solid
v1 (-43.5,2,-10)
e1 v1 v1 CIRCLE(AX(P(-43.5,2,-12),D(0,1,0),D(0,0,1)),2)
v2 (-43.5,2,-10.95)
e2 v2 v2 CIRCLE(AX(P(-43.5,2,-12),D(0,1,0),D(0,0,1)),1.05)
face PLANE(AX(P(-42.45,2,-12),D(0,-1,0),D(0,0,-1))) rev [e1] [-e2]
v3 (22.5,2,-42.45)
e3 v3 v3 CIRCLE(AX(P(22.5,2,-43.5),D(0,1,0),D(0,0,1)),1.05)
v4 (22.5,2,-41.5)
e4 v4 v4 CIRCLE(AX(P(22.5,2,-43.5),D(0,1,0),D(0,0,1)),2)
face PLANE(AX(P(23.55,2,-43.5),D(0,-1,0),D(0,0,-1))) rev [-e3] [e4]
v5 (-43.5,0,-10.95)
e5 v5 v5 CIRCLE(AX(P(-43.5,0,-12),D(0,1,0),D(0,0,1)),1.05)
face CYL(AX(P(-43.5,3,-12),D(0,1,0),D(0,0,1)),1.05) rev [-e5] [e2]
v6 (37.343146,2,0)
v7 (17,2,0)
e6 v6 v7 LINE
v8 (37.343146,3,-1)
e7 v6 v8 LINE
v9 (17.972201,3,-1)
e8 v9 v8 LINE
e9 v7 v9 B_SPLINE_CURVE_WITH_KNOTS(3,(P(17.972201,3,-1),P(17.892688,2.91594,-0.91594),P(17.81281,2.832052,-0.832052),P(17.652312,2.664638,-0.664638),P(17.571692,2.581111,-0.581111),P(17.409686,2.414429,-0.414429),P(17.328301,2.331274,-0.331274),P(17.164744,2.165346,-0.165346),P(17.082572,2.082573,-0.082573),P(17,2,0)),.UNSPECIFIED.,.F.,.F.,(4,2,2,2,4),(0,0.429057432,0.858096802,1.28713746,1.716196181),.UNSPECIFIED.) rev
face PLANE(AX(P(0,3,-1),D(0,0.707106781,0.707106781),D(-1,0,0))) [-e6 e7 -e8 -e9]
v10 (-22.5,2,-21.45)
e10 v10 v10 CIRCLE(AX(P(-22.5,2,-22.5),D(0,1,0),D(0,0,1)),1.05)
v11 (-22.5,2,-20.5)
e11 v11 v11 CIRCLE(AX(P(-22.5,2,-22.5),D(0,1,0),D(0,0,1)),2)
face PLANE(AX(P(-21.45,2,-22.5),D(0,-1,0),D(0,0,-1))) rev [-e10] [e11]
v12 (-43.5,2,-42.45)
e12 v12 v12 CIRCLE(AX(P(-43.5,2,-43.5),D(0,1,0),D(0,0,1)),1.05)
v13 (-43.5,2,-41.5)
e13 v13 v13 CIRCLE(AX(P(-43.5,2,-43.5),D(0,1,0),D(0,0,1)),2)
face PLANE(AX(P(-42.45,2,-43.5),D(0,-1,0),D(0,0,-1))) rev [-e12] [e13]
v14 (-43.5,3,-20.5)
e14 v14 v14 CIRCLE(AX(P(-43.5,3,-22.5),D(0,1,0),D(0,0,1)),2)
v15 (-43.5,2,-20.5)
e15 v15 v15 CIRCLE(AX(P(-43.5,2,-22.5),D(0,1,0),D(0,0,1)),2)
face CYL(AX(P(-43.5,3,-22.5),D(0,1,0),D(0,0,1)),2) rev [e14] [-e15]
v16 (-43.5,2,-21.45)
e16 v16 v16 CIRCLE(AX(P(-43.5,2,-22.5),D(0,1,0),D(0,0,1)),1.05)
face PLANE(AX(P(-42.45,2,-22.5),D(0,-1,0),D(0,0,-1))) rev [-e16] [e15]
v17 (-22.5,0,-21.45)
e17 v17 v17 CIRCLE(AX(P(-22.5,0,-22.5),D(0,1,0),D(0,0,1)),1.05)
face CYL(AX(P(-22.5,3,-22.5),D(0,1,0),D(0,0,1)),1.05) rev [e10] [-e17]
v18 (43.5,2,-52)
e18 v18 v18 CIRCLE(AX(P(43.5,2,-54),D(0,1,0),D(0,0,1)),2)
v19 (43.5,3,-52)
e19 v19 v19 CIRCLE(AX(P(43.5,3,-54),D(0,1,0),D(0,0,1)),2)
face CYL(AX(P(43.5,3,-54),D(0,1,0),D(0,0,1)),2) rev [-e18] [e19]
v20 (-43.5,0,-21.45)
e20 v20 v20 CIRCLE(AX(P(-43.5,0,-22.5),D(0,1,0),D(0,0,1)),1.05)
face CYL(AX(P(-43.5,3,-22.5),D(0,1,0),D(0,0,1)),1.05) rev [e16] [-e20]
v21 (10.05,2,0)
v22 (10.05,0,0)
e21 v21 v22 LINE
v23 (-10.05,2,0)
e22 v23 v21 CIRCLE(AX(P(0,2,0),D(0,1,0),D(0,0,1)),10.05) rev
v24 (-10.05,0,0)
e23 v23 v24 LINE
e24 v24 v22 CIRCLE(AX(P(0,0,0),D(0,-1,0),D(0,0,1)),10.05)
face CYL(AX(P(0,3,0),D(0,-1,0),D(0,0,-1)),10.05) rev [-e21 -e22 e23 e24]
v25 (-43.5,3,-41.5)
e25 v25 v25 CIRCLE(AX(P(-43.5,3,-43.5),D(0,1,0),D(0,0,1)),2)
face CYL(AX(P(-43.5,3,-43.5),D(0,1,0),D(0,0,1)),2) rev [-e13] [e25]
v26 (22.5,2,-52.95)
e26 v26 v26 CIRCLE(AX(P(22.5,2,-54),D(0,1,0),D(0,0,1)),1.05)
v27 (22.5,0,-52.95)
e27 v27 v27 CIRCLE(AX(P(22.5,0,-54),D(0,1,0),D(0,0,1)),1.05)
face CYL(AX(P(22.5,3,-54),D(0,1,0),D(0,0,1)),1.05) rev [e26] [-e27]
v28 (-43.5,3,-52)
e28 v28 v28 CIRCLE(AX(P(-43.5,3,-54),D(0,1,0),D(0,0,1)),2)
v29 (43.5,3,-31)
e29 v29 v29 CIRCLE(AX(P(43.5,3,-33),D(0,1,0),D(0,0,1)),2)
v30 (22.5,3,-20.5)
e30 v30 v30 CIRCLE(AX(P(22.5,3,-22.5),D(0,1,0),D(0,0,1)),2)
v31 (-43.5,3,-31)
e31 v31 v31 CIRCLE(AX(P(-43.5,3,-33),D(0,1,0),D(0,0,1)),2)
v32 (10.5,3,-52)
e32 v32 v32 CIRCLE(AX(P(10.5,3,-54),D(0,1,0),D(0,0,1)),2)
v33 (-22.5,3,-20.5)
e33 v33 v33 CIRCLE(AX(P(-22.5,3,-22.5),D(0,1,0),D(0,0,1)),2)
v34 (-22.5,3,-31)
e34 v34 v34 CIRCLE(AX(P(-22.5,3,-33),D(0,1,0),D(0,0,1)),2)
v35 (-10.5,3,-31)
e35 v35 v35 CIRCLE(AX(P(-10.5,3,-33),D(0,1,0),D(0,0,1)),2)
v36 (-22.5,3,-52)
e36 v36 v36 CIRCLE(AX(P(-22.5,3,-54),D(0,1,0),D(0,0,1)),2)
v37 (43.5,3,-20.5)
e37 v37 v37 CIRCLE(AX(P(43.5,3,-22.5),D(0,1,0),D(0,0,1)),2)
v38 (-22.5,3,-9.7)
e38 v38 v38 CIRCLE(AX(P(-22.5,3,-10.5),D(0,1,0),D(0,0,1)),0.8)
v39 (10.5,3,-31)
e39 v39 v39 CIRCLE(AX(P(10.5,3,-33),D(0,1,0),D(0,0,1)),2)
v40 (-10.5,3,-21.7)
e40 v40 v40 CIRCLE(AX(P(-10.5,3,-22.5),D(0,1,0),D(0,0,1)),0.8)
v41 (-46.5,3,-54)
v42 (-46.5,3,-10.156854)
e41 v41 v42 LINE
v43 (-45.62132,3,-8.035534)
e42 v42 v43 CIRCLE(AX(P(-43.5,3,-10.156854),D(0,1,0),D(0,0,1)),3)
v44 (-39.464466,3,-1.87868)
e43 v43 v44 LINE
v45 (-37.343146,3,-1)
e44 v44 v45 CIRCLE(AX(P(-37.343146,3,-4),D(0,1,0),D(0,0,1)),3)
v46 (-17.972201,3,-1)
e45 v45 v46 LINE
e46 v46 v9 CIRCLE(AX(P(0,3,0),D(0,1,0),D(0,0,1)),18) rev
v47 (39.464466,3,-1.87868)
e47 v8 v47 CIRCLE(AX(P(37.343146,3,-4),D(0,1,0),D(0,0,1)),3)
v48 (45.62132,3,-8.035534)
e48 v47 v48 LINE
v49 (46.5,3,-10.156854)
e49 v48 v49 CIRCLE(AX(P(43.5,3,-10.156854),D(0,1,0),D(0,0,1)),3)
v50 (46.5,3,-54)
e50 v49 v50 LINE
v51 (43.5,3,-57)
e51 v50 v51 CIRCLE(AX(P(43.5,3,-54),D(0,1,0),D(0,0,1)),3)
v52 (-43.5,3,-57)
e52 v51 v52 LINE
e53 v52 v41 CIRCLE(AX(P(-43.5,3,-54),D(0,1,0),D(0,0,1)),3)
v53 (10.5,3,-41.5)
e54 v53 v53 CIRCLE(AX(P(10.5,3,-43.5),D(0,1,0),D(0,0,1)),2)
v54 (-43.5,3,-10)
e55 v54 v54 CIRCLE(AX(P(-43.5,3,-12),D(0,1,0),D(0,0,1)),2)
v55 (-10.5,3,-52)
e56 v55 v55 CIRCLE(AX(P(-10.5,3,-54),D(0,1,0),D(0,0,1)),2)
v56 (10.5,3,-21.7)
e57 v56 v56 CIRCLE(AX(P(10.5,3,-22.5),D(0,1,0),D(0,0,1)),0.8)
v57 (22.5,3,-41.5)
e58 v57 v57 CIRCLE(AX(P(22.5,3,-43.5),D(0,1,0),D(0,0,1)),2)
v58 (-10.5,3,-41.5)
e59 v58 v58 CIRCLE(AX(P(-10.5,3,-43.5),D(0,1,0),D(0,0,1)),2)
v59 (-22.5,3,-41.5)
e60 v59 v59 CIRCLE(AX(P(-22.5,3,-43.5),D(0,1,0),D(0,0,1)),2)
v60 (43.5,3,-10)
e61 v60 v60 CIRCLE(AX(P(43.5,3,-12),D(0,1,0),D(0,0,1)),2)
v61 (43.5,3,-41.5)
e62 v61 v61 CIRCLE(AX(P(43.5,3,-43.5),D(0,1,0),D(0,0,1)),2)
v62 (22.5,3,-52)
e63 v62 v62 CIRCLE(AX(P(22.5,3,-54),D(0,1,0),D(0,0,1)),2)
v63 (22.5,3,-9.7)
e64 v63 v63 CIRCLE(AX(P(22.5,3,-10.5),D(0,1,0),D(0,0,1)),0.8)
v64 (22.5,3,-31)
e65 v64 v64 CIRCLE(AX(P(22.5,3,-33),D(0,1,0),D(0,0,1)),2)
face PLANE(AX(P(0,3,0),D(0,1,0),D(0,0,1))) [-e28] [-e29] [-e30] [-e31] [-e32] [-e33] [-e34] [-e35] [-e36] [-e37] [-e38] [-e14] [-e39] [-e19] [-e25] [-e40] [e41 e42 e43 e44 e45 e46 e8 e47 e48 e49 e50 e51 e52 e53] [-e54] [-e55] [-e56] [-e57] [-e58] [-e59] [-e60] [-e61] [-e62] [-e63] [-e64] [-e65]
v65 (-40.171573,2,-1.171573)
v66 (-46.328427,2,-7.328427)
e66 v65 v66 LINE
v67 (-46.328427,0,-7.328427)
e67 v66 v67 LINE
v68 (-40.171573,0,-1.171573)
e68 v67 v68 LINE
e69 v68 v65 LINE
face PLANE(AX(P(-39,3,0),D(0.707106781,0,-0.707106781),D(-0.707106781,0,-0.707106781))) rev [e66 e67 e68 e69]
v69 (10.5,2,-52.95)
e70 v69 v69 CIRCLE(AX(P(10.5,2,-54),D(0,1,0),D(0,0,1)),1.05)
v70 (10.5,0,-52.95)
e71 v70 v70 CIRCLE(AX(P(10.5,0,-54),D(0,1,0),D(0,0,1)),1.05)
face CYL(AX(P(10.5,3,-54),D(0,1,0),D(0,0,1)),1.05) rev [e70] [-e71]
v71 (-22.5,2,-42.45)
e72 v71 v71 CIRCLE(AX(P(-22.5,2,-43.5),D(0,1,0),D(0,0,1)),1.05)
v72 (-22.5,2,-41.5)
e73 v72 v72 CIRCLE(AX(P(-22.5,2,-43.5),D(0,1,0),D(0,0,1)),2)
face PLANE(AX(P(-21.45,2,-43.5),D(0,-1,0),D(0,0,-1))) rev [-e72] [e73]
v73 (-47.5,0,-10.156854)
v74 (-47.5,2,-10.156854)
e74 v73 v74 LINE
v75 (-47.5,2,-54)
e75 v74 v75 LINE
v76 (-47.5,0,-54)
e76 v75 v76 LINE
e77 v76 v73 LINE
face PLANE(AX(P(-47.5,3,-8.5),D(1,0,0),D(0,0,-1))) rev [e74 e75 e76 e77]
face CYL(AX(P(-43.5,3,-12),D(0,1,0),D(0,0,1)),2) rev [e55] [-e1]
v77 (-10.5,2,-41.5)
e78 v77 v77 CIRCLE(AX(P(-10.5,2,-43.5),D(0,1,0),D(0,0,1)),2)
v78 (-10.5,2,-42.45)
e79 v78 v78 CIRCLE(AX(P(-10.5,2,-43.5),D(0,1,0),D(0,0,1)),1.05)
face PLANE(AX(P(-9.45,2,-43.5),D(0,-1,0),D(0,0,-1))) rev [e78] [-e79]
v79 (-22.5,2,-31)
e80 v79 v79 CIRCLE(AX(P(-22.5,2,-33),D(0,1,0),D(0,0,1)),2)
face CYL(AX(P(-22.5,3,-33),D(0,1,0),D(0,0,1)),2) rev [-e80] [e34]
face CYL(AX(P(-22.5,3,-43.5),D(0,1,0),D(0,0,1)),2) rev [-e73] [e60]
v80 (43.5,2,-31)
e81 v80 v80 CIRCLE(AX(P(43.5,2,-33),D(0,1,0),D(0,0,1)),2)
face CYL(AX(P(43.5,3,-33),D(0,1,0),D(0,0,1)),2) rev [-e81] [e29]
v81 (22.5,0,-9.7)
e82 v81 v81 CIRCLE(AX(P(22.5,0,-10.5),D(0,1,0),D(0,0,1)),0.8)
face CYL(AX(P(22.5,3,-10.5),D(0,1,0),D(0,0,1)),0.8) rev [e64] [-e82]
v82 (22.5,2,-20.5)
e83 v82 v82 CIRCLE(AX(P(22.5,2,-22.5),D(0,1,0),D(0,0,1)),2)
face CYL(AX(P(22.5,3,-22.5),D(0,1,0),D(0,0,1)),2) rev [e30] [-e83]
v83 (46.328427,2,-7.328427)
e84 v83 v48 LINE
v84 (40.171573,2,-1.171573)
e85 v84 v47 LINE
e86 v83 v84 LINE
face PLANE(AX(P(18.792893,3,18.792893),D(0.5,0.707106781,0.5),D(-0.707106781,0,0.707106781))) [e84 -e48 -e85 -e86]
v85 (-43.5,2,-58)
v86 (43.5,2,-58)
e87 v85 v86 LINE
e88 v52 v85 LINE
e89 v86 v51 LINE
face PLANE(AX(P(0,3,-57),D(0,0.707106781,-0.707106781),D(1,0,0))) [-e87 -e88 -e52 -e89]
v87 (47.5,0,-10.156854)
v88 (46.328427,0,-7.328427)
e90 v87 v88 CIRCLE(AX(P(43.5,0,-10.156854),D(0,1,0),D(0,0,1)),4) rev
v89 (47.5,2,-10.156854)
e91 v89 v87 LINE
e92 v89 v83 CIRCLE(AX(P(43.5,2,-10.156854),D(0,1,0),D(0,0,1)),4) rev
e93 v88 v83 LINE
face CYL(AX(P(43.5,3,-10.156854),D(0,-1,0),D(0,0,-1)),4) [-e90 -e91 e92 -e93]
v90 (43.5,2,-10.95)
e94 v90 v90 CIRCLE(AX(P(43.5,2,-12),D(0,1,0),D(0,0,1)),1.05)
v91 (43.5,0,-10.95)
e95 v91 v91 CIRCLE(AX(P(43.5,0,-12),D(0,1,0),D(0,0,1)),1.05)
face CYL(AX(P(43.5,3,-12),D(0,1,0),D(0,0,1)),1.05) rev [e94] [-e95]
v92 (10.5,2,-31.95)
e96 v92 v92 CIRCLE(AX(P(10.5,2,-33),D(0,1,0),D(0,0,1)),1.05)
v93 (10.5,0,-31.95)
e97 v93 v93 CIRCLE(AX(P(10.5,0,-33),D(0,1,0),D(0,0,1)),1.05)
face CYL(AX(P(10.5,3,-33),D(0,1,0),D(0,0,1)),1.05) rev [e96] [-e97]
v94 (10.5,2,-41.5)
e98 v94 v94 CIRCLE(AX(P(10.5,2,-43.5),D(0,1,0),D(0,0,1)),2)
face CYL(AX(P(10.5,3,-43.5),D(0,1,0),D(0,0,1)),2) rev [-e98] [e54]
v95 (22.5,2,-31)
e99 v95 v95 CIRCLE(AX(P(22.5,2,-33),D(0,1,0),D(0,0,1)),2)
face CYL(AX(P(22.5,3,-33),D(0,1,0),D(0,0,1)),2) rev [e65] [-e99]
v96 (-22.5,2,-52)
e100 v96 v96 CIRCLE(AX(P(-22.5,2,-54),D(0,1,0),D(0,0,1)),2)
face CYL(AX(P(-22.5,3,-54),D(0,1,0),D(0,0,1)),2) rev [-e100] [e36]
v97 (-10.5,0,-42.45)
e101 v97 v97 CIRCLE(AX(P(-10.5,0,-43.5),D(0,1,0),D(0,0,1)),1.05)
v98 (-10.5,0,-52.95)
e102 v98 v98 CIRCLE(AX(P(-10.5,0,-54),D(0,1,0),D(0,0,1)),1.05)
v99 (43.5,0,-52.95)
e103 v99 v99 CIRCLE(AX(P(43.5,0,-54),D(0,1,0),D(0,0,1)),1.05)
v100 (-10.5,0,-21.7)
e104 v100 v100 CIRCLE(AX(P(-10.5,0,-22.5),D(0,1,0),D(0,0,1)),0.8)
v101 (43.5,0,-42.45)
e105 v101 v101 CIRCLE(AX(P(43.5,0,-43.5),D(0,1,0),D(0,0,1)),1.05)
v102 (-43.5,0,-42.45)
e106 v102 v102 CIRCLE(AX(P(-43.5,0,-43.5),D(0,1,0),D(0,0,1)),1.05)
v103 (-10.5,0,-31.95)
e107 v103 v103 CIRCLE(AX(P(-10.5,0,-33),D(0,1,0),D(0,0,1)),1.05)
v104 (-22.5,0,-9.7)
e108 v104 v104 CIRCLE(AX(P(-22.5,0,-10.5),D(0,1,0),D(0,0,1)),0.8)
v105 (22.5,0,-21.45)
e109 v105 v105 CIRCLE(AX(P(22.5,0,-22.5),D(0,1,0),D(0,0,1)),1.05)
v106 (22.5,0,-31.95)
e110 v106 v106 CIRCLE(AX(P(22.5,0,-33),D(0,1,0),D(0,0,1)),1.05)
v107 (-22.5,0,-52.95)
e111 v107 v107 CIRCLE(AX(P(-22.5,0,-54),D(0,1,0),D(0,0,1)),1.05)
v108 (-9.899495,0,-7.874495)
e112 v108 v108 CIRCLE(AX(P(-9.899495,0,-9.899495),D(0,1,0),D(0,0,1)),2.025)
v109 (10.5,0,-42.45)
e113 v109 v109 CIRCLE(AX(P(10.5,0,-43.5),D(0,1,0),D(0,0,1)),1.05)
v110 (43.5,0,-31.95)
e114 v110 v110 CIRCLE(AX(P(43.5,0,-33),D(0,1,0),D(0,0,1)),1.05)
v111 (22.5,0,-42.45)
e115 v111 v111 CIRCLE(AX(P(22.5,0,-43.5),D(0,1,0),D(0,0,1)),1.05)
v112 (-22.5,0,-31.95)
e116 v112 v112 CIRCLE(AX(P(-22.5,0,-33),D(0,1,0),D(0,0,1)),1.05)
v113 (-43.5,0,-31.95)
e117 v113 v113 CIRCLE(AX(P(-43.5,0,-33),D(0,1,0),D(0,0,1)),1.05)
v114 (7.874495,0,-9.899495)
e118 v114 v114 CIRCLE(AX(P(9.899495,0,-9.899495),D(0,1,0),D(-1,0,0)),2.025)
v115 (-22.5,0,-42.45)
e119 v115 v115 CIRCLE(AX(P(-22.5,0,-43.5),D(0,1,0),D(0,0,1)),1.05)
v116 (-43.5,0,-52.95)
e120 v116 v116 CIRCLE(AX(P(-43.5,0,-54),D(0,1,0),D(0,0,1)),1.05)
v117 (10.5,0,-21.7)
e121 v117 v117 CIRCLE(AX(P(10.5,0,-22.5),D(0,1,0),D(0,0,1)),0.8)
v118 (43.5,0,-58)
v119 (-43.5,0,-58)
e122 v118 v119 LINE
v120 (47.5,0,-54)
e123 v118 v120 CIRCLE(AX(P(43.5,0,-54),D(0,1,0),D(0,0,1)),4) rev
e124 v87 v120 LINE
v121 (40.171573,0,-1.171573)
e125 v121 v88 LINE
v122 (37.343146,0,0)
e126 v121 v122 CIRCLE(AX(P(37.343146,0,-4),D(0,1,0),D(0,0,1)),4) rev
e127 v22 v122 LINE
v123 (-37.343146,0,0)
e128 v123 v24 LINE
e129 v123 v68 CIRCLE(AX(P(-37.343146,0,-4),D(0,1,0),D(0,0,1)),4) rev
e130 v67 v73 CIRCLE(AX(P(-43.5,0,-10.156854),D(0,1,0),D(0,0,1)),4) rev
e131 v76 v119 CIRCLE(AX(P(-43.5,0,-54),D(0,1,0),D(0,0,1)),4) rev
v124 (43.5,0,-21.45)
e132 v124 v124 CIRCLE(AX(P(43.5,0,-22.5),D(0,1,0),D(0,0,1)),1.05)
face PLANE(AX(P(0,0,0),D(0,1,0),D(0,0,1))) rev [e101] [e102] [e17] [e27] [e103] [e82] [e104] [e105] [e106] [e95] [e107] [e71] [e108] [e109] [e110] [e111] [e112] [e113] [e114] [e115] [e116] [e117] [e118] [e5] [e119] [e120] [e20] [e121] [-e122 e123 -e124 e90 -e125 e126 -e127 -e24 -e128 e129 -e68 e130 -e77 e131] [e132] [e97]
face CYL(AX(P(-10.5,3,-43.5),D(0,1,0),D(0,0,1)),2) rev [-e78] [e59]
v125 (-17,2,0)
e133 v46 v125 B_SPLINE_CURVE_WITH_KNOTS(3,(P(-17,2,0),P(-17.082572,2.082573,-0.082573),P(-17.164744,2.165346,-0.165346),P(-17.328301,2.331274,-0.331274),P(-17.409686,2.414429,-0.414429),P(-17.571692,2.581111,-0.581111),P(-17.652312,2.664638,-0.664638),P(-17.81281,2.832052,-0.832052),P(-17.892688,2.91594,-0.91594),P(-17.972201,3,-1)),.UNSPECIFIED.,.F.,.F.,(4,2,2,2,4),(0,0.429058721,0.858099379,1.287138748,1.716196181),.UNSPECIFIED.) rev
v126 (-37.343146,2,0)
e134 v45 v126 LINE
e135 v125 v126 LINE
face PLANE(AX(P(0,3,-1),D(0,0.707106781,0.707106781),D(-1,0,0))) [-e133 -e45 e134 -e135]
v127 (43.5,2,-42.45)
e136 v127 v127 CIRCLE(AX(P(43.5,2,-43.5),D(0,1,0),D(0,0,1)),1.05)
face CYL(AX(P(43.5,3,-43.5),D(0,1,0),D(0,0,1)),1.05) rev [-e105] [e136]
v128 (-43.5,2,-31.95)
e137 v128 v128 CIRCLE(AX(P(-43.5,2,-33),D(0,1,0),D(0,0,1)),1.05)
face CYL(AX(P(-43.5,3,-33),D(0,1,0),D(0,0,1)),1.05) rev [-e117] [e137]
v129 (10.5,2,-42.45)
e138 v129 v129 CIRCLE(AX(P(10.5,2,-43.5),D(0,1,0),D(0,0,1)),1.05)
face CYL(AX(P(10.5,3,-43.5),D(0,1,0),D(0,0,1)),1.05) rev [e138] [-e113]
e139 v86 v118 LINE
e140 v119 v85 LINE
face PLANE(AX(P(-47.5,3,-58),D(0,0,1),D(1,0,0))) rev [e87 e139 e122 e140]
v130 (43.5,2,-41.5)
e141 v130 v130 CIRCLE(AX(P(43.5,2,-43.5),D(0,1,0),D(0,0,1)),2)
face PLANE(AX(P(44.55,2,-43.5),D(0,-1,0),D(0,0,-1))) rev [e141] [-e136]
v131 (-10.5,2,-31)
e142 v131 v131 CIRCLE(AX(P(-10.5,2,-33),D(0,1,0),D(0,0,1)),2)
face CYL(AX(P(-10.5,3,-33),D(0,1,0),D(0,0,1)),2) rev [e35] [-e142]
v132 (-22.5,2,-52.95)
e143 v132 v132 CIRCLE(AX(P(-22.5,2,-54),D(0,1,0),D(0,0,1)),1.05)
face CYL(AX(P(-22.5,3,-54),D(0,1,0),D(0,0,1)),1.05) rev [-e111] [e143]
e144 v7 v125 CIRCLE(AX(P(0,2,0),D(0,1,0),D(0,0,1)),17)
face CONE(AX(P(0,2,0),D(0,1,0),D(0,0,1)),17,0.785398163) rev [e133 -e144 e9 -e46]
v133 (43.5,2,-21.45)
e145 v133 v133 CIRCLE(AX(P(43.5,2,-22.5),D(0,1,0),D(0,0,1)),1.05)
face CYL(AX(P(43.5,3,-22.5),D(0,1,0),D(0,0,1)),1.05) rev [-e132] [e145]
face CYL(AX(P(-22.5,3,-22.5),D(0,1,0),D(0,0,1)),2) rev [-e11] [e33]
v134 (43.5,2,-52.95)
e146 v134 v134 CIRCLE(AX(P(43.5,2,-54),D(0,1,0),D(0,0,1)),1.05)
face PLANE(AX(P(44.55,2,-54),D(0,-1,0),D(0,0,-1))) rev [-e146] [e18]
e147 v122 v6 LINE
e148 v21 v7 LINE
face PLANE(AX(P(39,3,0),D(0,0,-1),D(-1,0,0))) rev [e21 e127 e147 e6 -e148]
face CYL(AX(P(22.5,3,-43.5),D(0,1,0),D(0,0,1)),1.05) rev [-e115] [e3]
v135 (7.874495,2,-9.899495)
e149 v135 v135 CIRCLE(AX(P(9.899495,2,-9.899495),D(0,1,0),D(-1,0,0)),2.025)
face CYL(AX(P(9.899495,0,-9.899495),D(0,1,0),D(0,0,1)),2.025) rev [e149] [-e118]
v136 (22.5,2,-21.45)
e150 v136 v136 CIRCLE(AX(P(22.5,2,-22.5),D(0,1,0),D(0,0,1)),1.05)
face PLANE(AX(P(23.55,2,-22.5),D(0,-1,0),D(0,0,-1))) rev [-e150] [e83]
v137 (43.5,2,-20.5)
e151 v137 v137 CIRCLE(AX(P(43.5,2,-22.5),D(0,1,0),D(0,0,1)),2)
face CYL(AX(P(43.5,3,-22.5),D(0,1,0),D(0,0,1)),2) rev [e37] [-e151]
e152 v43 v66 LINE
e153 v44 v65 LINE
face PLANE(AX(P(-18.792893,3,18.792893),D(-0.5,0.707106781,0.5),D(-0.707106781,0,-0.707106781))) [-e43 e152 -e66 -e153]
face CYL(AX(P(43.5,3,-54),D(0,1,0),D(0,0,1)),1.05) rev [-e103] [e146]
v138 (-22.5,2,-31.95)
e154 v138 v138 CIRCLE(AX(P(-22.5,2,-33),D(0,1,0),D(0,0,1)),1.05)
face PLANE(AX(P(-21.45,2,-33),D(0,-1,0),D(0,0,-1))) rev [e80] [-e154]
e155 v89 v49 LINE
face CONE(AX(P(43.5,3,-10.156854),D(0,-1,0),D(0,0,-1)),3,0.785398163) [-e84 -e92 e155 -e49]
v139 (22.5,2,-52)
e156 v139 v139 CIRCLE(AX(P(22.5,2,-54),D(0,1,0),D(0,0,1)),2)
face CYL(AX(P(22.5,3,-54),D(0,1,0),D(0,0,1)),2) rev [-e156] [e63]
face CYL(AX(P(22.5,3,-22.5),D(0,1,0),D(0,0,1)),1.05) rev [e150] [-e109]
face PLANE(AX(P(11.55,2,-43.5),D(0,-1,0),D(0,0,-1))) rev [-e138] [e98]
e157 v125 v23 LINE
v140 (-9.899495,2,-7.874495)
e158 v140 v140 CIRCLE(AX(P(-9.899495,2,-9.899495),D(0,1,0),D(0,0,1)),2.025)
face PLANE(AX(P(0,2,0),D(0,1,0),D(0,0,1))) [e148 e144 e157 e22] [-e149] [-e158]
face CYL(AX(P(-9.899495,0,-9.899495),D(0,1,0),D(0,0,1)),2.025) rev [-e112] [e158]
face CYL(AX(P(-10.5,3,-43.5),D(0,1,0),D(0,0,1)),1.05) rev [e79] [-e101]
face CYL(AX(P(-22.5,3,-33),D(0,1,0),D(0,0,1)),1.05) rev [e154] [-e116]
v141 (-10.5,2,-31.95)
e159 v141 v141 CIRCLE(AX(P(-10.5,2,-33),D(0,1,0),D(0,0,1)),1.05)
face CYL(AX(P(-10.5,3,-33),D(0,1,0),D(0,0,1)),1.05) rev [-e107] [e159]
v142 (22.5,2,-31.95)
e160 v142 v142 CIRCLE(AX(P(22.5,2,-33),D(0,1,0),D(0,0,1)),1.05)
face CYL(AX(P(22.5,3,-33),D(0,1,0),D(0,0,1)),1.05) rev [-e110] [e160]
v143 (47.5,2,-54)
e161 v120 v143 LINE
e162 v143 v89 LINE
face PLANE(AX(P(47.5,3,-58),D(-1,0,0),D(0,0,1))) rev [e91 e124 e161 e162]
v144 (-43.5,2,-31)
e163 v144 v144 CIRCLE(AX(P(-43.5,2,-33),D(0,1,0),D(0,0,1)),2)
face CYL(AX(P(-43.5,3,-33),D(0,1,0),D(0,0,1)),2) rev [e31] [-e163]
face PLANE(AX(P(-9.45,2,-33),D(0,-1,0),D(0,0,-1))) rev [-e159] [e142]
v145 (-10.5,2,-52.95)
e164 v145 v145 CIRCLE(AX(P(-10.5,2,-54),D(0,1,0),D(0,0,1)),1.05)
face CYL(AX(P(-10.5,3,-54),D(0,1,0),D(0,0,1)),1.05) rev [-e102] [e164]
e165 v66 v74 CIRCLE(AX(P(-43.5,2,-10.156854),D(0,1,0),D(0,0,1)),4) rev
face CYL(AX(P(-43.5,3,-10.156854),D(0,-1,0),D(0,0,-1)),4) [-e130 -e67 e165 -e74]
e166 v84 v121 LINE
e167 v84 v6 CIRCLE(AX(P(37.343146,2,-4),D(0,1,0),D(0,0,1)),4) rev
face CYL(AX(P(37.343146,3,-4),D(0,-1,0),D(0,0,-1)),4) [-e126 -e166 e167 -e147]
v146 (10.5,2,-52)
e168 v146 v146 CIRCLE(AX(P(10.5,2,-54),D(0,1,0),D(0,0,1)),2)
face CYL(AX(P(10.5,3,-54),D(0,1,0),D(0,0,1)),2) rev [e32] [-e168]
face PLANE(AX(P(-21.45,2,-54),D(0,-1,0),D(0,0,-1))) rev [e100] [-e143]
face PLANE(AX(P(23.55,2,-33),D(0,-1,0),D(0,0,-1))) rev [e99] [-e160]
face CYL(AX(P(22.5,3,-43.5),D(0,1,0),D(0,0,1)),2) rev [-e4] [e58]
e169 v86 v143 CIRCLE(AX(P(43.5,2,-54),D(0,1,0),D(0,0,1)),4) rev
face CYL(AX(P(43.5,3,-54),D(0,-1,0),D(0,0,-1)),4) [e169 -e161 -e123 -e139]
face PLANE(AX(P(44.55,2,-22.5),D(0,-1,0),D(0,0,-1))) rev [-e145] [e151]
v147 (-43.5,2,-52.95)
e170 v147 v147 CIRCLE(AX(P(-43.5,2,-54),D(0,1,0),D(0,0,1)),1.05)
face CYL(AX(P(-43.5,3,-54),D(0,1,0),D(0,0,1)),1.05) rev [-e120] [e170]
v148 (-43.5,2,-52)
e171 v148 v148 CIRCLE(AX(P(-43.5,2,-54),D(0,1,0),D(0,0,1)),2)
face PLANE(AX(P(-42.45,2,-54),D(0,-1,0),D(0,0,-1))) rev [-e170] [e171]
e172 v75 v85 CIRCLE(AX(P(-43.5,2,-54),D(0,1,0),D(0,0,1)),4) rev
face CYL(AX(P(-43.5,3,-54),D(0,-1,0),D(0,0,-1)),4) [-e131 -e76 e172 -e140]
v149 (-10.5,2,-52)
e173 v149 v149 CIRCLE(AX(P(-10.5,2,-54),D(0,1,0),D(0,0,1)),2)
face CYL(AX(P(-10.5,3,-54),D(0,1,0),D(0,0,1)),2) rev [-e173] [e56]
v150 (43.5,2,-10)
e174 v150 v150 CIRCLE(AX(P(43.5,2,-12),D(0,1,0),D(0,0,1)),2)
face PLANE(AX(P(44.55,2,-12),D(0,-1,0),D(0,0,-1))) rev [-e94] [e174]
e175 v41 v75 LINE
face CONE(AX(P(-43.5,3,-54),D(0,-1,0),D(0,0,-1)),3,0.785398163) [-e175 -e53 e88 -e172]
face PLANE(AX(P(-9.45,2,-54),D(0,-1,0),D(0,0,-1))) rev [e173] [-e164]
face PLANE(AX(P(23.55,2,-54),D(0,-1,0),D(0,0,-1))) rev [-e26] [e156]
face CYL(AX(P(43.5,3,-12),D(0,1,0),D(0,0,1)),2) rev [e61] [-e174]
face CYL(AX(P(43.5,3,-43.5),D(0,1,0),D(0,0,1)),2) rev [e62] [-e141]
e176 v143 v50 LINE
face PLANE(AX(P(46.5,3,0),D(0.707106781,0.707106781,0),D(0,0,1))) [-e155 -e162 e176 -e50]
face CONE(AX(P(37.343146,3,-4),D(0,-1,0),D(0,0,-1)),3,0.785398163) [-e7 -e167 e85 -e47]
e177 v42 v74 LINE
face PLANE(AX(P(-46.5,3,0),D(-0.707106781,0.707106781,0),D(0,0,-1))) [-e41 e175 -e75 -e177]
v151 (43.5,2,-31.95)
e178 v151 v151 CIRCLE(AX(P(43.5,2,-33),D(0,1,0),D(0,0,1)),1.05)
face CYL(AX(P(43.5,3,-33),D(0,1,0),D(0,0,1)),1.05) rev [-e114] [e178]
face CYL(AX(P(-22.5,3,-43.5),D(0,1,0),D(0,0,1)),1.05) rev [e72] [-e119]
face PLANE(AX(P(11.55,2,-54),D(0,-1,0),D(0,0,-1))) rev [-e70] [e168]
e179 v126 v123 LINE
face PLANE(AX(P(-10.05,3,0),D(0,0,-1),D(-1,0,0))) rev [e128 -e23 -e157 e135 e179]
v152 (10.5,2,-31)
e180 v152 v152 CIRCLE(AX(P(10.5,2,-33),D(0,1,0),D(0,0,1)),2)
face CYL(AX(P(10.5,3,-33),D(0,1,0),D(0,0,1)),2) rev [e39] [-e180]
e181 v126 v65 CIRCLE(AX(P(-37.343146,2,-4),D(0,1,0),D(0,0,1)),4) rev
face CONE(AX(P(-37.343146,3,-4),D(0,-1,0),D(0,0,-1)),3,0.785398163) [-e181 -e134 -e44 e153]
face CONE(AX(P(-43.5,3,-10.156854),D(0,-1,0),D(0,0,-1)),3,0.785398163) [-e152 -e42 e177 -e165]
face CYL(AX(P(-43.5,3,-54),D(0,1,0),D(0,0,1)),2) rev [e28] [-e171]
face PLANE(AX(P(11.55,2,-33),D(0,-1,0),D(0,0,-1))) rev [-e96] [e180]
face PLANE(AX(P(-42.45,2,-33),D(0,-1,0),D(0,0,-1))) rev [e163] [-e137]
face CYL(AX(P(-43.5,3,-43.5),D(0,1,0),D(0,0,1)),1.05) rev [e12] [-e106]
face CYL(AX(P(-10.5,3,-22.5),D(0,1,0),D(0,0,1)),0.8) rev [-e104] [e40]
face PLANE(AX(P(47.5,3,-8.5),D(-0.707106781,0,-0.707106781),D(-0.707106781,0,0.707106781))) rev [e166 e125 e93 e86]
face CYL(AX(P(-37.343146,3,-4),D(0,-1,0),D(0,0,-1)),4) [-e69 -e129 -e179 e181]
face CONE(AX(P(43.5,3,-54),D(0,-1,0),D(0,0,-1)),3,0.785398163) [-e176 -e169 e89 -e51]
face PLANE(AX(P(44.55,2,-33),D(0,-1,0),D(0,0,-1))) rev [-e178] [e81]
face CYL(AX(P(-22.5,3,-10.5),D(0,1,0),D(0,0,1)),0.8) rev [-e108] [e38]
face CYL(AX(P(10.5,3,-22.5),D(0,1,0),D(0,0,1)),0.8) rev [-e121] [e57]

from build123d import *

# Parameters (mm, degrees)
EXTRUDE_1_DEPTH               = 3
HOLE_WIZARD_M2_1_AT_2_COUNT   = 2
HOLE_WIZARD_M2_1_AT_2_PITCH   = 21
PATTERN_LINEAR_1_COUNT        = 3
PATTERN_LINEAR_1_PITCH        = 33
PATTERN_LINEAR_2_COUNT        = 3
PATTERN_LINEAR_2_PITCH        = 10.5
PATTERN_LINEAR_3_COUNT        = 2
PATTERN_LINEAR_3_PITCH        = 31.5
HOLE_WIZARD_M2_1_2_AT_2_COUNT = 2
HOLE_WIZARD_M2_1_2_AT_2_PITCH = 16.970562748
SKETCH_8_R                    = 17
CUT_EXTRUDE_1_DEPTH           = 1
SKETCH_9_R                    = 2.025
CUT_EXTRUDE_2_DEPTH           = 75.994999833
PATTERN_CIRCULAR_1_COUNT      = 2
PATTERN_CIRCULAR_1_ANGLE      = 90
FILLET_1_R                    = 4
CHAMFER_1_SIZE                = 1


with BuildPart() as part:
    # ｽｹｯﾁ1 → ﾎﾞｽ - 押し出し1 (new body)
    with BuildSketch(Plane(origin=(0, 0, 0), x_dir=(1, 0, 0), z_dir=(0, 1, 0))):
        with BuildLine():
            Line((-10.05, 0), (-39, 0))
            Line((-39, 0), (-47.5, 8.5))
            Line((-47.5, 8.5), (-47.5, 58))
            Line((-47.5, 58), (47.5, 58))
            Line((47.5, 58), (47.5, 8.5))
            Line((47.5, 8.5), (39, 0))
            Line((39, 0), (10.05, 0))
            ThreePointArc((10.05, 0), (0, 10.05), (-10.05, 0))
        make_face()
    extrude(amount=EXTRUDE_1_DEPTH)

    # ｽｹｯﾁ3 → Hole Wizard M2 _1 (revolve, cut)
    with BuildSketch(Plane(origin=(-43.5, 3, -54), x_dir=(0, 0, 1), z_dir=(1, 0, 0))):
        Polygon((0, 0), (0, 4.63090365), (1.05, 4), (1.05, 1), (2, 1), (2, 0), align=None)
    hole_wizard_m2_1 = revolve(axis=Axis((-43.5, 9.35, -54), (0, -1, 0)), mode=Mode.SUBTRACT)

    # Hole Wizard M2 _1 at 2: Hole Wizard M2 _1 ×2
    with Locations(*[(i * HOLE_WIZARD_M2_1_AT_2_PITCH, 0, 0) for i in range(1, HOLE_WIZARD_M2_1_AT_2_COUNT)]):
        add(hole_wizard_m2_1, mode=Mode.SUBTRACT)

    # 直線ﾊﾟﾀｰﾝ1: Hole Wizard M2 _1 ×3
    with Locations(*[(i * PATTERN_LINEAR_1_PITCH, 0, 0) for i in range(1, PATTERN_LINEAR_1_COUNT)]):
        add(hole_wizard_m2_1, mode=Mode.SUBTRACT)

    # 直線ﾊﾟﾀｰﾝ1 copy 1 sketch → 直線ﾊﾟﾀｰﾝ1 copy 1 (revolve, cut)
    with BuildSketch(Plane(origin=(10.5, 3, -54), x_dir=(0, 0, 1), z_dir=(1, 0, 0))):
        Polygon((0, 0), (0, 4.63090365), (1.05, 4), (1.05, 1), (2, 1), (2, 0), align=None)
    revolve(axis=Axis((10.5, 9.35, -54), (0, -1, 0)), mode=Mode.SUBTRACT)

    # 直線ﾊﾟﾀｰﾝ1 copy 2 sketch → 直線ﾊﾟﾀｰﾝ1 copy 2 (revolve, cut)
    with BuildSketch(Plane(origin=(43.5, 3, -54), x_dir=(0, 0, 1), z_dir=(1, 0, 0))):
        Polygon((0, 0), (0, 4.63090365), (1.05, 4), (1.05, 1), (2, 1), (2, 0), align=None)
    revolve(axis=Axis((43.5, 9.35, -54), (0, -1, 0)), mode=Mode.SUBTRACT)

    # 直線ﾊﾟﾀｰﾝ2: Hole Wizard M2 _1 ×3
    with Locations(*[(0, 0, i * PATTERN_LINEAR_2_PITCH) for i in range(1, PATTERN_LINEAR_2_COUNT)]):
        add(hole_wizard_m2_1, mode=Mode.SUBTRACT)

    # 直線ﾊﾟﾀｰﾝ2 copy 1 sketch → 直線ﾊﾟﾀｰﾝ2 copy 1 (revolve, cut)
    with BuildSketch(Plane(origin=(-22.5, 3, -43.5), x_dir=(0, 0, 1), z_dir=(1, 0, 0))):
        Polygon((0, 0), (0, 4.63090365), (1.05, 4), (1.05, 1), (2, 1), (2, 0), align=None)
    revolve(axis=Axis((-22.5, 9.35, -43.5), (0, -1, 0)), mode=Mode.SUBTRACT)

    # 直線ﾊﾟﾀｰﾝ2 copy 2 sketch → 直線ﾊﾟﾀｰﾝ2 copy 2 (revolve, cut)
    with BuildSketch(Plane(origin=(-22.5, 3, -33), x_dir=(0, 0, 1), z_dir=(1, 0, 0))):
        Polygon((0, 0), (0, 4.63090365), (1.05, 4), (1.05, 1), (2, 1), (2, 0), align=None)
    revolve(axis=Axis((-22.5, 9.35, -33), (0, -1, 0)), mode=Mode.SUBTRACT)

    # 直線ﾊﾟﾀｰﾝ2 copy 3 sketch → 直線ﾊﾟﾀｰﾝ2 copy 3 (revolve, cut)
    with BuildSketch(Plane(origin=(-10.5, 3, -43.5), x_dir=(0, 0, 1), z_dir=(1, 0, 0))):
        Polygon((0, 0), (0, 4.63090365), (1.05, 4), (1.05, 1), (2, 1), (2, 0), align=None)
    revolve(axis=Axis((-10.5, 9.35, -43.5), (0, -1, 0)), mode=Mode.SUBTRACT)

    # 直線ﾊﾟﾀｰﾝ2 copy 4 sketch → 直線ﾊﾟﾀｰﾝ2 copy 4 (revolve, cut)
    with BuildSketch(Plane(origin=(-10.5, 3, -33), x_dir=(0, 0, 1), z_dir=(1, 0, 0))):
        Polygon((0, 0), (0, 4.63090365), (1.05, 4), (1.05, 1), (2, 1), (2, 0), align=None)
    revolve(axis=Axis((-10.5, 9.35, -33), (0, -1, 0)), mode=Mode.SUBTRACT)

    # 直線ﾊﾟﾀｰﾝ2 copy 5 sketch → 直線ﾊﾟﾀｰﾝ2 copy 5 (revolve, cut)
    with BuildSketch(Plane(origin=(22.5, 3, -43.5), x_dir=(0, 0, 1), z_dir=(1, 0, 0))):
        Polygon((0, 0), (0, 4.63090365), (1.05, 4), (1.05, 1), (2, 1), (2, 0), align=None)
    revolve(axis=Axis((22.5, 9.35, -43.5), (0, -1, 0)), mode=Mode.SUBTRACT)

    # 直線ﾊﾟﾀｰﾝ2 copy 6 sketch → 直線ﾊﾟﾀｰﾝ2 copy 6 (revolve, cut)
    with BuildSketch(Plane(origin=(22.5, 3, -33), x_dir=(0, 0, 1), z_dir=(1, 0, 0))):
        Polygon((0, 0), (0, 4.63090365), (1.05, 4), (1.05, 1), (2, 1), (2, 0), align=None)
    revolve(axis=Axis((22.5, 9.35, -33), (0, -1, 0)), mode=Mode.SUBTRACT)

    # 直線ﾊﾟﾀｰﾝ2 copy 7 sketch → 直線ﾊﾟﾀｰﾝ2 copy 7 (revolve, cut)
    with BuildSketch(Plane(origin=(10.5, 3, -43.5), x_dir=(0, 0, 1), z_dir=(1, 0, 0))):
        Polygon((0, 0), (0, 4.63090365), (1.05, 4), (1.05, 1), (2, 1), (2, 0), align=None)
    revolve(axis=Axis((10.5, 9.35, -43.5), (0, -1, 0)), mode=Mode.SUBTRACT)

    # 直線ﾊﾟﾀｰﾝ2 copy 8 sketch → 直線ﾊﾟﾀｰﾝ2 copy 8 (revolve, cut)
    with BuildSketch(Plane(origin=(10.5, 3, -33), x_dir=(0, 0, 1), z_dir=(1, 0, 0))):
        Polygon((0, 0), (0, 4.63090365), (1.05, 4), (1.05, 1), (2, 1), (2, 0), align=None)
    revolve(axis=Axis((10.5, 9.35, -33), (0, -1, 0)), mode=Mode.SUBTRACT)

    # 直線ﾊﾟﾀｰﾝ2 copy 9 sketch → 直線ﾊﾟﾀｰﾝ2 copy 9 (revolve, cut)
    with BuildSketch(Plane(origin=(43.5, 3, -43.5), x_dir=(0, 0, 1), z_dir=(1, 0, 0))):
        Polygon((0, 0), (0, 4.63090365), (1.05, 4), (1.05, 1), (2, 1), (2, 0), align=None)
    revolve(axis=Axis((43.5, 9.35, -43.5), (0, -1, 0)), mode=Mode.SUBTRACT)

    # 直線ﾊﾟﾀｰﾝ2 copy 10 sketch → 直線ﾊﾟﾀｰﾝ2 copy 10 (revolve, cut)
    with BuildSketch(Plane(origin=(43.5, 3, -33), x_dir=(0, 0, 1), z_dir=(1, 0, 0))):
        Polygon((0, 0), (0, 4.63090365), (1.05, 4), (1.05, 1), (2, 1), (2, 0), align=None)
    revolve(axis=Axis((43.5, 9.35, -33), (0, -1, 0)), mode=Mode.SUBTRACT)

    # 直線ﾊﾟﾀｰﾝ3: Hole Wizard M2 _1 ×2
    with Locations(*[(0, 0, i * PATTERN_LINEAR_3_PITCH) for i in range(1, PATTERN_LINEAR_3_COUNT)]):
        add(hole_wizard_m2_1, mode=Mode.SUBTRACT)

    # 直線ﾊﾟﾀｰﾝ3 copy 1 sketch → 直線ﾊﾟﾀｰﾝ3 copy 1 (revolve, cut)
    with BuildSketch(Plane(origin=(-22.5, 3, -22.5), x_dir=(0, 0, 1), z_dir=(1, 0, 0))):
        Polygon((0, 0), (0, 4.63090365), (1.05, 4), (1.05, 1), (2, 1), (2, 0), align=None)
    revolve(axis=Axis((-22.5, 9.35, -22.5), (0, -1, 0)), mode=Mode.SUBTRACT)

    # ｽｹｯﾁ5 → Hole Wizard M2 _1 2 (revolve, cut)
    with BuildSketch(Plane(origin=(-10.5, 3, -22.5), x_dir=(0, 0, 1), z_dir=(1, 0, 0))):
        Polygon((0, 0), (0, 6.480688495), (0.8, 6), (0.8, 0), align=None)
    hole_wizard_m2_1_2 = revolve(axis=Axis((-10.5, 9.35, -22.5), (0, -1, 0)), mode=Mode.SUBTRACT)

    # Hole Wizard M2 _1 2 at 2: Hole Wizard M2 _1 2 ×2
    with Locations(*[Vector(-0.7071067811865469, 0, 0.7071067811865482) * (i * HOLE_WIZARD_M2_1_2_AT_2_PITCH) for i in range(1, HOLE_WIZARD_M2_1_2_AT_2_COUNT)]):
        add(hole_wizard_m2_1_2, mode=Mode.SUBTRACT)

    # ｽｹｯﾁ7 → M2 なべ頭ねじ用座ぐり穴2 (revolve, cut)
    with BuildSketch(Plane(origin=(-43.5, 3, -12), x_dir=(0, 0, 1), z_dir=(1, 0, 0))):
        Polygon((0, 0), (0, 6.63090365), (1.05, 6), (1.05, 1), (2, 1), (2, 0), align=None)
    hole_wizard_m2_2 = revolve(axis=Axis((-43.5, 9.35, -12), (0, -1, 0)), mode=Mode.SUBTRACT)

    # ﾐﾗｰ1: Hole Wizard M2 _1 2, M2 なべ頭ねじ用座ぐり穴2 across plane
    add(hole_wizard_m2_1_2.mirror(Plane(origin=(0, 0, 0), x_dir=(0, 0, 1), z_dir=(1, 0, 0))), mode=Mode.SUBTRACT)
    add(hole_wizard_m2_2.mirror(Plane(origin=(0, 0, 0), x_dir=(0, 0, 1), z_dir=(1, 0, 0))), mode=Mode.SUBTRACT)

    # ﾐﾗｰ1 copy 1 sketch → ﾐﾗｰ1 copy 1 (revolve, cut)
    with BuildSketch(Plane(origin=(43.5, 3, -22.5), x_dir=(0, 0, 1), z_dir=(-1, 0, 0))):
        Polygon((0, 0), (0, -4.63090365), (1.05, -4), (1.05, -1), (2, -1), (2, 0), align=None)
    revolve(axis=Axis((43.5, 9.35, -22.5), (0, 1, 0)), mode=Mode.SUBTRACT)

    # ﾐﾗｰ1 copy 2 sketch → ﾐﾗｰ1 copy 2 (revolve, cut)
    with BuildSketch(Plane(origin=(22.5, 3, -22.5), x_dir=(0, 0, 1), z_dir=(-1, 0, 0))):
        Polygon((0, 0), (0, -4.63090365), (1.05, -4), (1.05, -1), (2, -1), (2, 0), align=None)
    revolve(axis=Axis((22.5, 9.35, -22.5), (0, 1, 0)), mode=Mode.SUBTRACT)

    # ﾐﾗｰ1 copy 3 sketch → ﾐﾗｰ1 copy 3 (revolve, cut)
    with BuildSketch(Plane(origin=(43.5, 3, -54), x_dir=(0, 0, 1), z_dir=(-1, 0, 0))):
        Polygon((0, 0), (0, -4.63090365), (1.05, -4), (1.05, -1), (2, -1), (2, 0), align=None)
    revolve(axis=Axis((43.5, 9.35, -54), (0, 1, 0)), mode=Mode.SUBTRACT)

    # ﾐﾗｰ1 copy 4 sketch → ﾐﾗｰ1 copy 4 (revolve, cut)
    with BuildSketch(Plane(origin=(22.5, 3, -54), x_dir=(0, 0, 1), z_dir=(-1, 0, 0))):
        Polygon((0, 0), (0, -4.63090365), (1.05, -4), (1.05, -1), (2, -1), (2, 0), align=None)
    revolve(axis=Axis((22.5, 9.35, -54), (0, 1, 0)), mode=Mode.SUBTRACT)

    # ﾐﾗｰ1 copy 5 sketch → ﾐﾗｰ1 copy 5 (revolve, cut)
    with BuildSketch(Plane(origin=(22.5, 3, -10.5), x_dir=(0, 0, 1), z_dir=(-1, 0, 0))):
        Polygon((0, 0), (0, -6.480688495), (0.8, -6), (0.8, 0), align=None)
    revolve(axis=Axis((22.5, 9.35, -10.5), (0, 1, 0)), mode=Mode.SUBTRACT)

    # ｽｹｯﾁ8 → ｶｯﾄ - 押し出し1 (cut)
    with BuildSketch(Plane(origin=(0, 3, 0), x_dir=(1, 0, 0), z_dir=(0, 1, 0))):
        Circle(SKETCH_8_R)
    extrude(amount=-CUT_EXTRUDE_1_DEPTH, mode=Mode.SUBTRACT)

    # ｽｹｯﾁ9 → ｶｯﾄ - 押し出し2 (cut, through all)
    with BuildSketch(Plane(origin=(0, 2, 0), x_dir=(1, 0, 0), z_dir=(0, 1, 0))):
        with Locations(Location((-9.899494937, 9.899494937, 0), (0, 0, 270))):
            Circle(SKETCH_9_R)
    cut_extrude_2 = extrude(amount=-CUT_EXTRUDE_2_DEPTH, mode=Mode.SUBTRACT)

    # 円形ﾊﾟﾀｰﾝ1: ｶｯﾄ - 押し出し2 ×2 about axis
    pattern_circular_1_axis = Axis((0, 3, 0), (0, -1, 0))
    for i in range(1, PATTERN_CIRCULAR_1_COUNT):
        add(cut_extrude_2.rotate(pattern_circular_1_axis, i * PATTERN_CIRCULAR_1_ANGLE / (PATTERN_CIRCULAR_1_COUNT - 1)), mode=Mode.SUBTRACT)

    # ﾌｨﾚｯﾄ1
    fillet_1_edges = [part.edges().sort_by_distance(p)[0] for p in [
        (-47.5, 1.5, -8.5),
        (-47.5, 1.5, -58),
        (47.5, 1.5, -58),
        (47.5, 1.5, -8.5),
        (39, 1.5, 0),
        (-39, 1.5, 0),
    ]]
    fillet(fillet_1_edges, radius=FILLET_1_R)

    # 面取り1
    chamfer_1_edges = [part.edges().sort_by_distance(p)[0] for p in [
        (0, 3, -17),
        (27.171572875, 3, 0),
        (38.87387948, 3, -0.30448187),
        (43.25, 3, -4.25),
        (47.19551813, 3, -8.62612052),
        (47.5, 3, -32.078427125),
        (-27.171572875, 3, 0),
        (46.328427125, 3, -56.828427125),
        (-38.87387948, 3, -0.30448187),
        (0, 3, -58),
        (-43.25, 3, -4.25),
        (-46.328427125, 3, -56.828427125),
        (-47.19551813, 3, -8.62612052),
        (-47.5, 3, -32.078427125),
    ]]
    chamfer(chamfer_1_edges, length=CHAMFER_1_SIZE - 0.0001)  # a hair under: the kernel refuses the full size


solid = part.part
